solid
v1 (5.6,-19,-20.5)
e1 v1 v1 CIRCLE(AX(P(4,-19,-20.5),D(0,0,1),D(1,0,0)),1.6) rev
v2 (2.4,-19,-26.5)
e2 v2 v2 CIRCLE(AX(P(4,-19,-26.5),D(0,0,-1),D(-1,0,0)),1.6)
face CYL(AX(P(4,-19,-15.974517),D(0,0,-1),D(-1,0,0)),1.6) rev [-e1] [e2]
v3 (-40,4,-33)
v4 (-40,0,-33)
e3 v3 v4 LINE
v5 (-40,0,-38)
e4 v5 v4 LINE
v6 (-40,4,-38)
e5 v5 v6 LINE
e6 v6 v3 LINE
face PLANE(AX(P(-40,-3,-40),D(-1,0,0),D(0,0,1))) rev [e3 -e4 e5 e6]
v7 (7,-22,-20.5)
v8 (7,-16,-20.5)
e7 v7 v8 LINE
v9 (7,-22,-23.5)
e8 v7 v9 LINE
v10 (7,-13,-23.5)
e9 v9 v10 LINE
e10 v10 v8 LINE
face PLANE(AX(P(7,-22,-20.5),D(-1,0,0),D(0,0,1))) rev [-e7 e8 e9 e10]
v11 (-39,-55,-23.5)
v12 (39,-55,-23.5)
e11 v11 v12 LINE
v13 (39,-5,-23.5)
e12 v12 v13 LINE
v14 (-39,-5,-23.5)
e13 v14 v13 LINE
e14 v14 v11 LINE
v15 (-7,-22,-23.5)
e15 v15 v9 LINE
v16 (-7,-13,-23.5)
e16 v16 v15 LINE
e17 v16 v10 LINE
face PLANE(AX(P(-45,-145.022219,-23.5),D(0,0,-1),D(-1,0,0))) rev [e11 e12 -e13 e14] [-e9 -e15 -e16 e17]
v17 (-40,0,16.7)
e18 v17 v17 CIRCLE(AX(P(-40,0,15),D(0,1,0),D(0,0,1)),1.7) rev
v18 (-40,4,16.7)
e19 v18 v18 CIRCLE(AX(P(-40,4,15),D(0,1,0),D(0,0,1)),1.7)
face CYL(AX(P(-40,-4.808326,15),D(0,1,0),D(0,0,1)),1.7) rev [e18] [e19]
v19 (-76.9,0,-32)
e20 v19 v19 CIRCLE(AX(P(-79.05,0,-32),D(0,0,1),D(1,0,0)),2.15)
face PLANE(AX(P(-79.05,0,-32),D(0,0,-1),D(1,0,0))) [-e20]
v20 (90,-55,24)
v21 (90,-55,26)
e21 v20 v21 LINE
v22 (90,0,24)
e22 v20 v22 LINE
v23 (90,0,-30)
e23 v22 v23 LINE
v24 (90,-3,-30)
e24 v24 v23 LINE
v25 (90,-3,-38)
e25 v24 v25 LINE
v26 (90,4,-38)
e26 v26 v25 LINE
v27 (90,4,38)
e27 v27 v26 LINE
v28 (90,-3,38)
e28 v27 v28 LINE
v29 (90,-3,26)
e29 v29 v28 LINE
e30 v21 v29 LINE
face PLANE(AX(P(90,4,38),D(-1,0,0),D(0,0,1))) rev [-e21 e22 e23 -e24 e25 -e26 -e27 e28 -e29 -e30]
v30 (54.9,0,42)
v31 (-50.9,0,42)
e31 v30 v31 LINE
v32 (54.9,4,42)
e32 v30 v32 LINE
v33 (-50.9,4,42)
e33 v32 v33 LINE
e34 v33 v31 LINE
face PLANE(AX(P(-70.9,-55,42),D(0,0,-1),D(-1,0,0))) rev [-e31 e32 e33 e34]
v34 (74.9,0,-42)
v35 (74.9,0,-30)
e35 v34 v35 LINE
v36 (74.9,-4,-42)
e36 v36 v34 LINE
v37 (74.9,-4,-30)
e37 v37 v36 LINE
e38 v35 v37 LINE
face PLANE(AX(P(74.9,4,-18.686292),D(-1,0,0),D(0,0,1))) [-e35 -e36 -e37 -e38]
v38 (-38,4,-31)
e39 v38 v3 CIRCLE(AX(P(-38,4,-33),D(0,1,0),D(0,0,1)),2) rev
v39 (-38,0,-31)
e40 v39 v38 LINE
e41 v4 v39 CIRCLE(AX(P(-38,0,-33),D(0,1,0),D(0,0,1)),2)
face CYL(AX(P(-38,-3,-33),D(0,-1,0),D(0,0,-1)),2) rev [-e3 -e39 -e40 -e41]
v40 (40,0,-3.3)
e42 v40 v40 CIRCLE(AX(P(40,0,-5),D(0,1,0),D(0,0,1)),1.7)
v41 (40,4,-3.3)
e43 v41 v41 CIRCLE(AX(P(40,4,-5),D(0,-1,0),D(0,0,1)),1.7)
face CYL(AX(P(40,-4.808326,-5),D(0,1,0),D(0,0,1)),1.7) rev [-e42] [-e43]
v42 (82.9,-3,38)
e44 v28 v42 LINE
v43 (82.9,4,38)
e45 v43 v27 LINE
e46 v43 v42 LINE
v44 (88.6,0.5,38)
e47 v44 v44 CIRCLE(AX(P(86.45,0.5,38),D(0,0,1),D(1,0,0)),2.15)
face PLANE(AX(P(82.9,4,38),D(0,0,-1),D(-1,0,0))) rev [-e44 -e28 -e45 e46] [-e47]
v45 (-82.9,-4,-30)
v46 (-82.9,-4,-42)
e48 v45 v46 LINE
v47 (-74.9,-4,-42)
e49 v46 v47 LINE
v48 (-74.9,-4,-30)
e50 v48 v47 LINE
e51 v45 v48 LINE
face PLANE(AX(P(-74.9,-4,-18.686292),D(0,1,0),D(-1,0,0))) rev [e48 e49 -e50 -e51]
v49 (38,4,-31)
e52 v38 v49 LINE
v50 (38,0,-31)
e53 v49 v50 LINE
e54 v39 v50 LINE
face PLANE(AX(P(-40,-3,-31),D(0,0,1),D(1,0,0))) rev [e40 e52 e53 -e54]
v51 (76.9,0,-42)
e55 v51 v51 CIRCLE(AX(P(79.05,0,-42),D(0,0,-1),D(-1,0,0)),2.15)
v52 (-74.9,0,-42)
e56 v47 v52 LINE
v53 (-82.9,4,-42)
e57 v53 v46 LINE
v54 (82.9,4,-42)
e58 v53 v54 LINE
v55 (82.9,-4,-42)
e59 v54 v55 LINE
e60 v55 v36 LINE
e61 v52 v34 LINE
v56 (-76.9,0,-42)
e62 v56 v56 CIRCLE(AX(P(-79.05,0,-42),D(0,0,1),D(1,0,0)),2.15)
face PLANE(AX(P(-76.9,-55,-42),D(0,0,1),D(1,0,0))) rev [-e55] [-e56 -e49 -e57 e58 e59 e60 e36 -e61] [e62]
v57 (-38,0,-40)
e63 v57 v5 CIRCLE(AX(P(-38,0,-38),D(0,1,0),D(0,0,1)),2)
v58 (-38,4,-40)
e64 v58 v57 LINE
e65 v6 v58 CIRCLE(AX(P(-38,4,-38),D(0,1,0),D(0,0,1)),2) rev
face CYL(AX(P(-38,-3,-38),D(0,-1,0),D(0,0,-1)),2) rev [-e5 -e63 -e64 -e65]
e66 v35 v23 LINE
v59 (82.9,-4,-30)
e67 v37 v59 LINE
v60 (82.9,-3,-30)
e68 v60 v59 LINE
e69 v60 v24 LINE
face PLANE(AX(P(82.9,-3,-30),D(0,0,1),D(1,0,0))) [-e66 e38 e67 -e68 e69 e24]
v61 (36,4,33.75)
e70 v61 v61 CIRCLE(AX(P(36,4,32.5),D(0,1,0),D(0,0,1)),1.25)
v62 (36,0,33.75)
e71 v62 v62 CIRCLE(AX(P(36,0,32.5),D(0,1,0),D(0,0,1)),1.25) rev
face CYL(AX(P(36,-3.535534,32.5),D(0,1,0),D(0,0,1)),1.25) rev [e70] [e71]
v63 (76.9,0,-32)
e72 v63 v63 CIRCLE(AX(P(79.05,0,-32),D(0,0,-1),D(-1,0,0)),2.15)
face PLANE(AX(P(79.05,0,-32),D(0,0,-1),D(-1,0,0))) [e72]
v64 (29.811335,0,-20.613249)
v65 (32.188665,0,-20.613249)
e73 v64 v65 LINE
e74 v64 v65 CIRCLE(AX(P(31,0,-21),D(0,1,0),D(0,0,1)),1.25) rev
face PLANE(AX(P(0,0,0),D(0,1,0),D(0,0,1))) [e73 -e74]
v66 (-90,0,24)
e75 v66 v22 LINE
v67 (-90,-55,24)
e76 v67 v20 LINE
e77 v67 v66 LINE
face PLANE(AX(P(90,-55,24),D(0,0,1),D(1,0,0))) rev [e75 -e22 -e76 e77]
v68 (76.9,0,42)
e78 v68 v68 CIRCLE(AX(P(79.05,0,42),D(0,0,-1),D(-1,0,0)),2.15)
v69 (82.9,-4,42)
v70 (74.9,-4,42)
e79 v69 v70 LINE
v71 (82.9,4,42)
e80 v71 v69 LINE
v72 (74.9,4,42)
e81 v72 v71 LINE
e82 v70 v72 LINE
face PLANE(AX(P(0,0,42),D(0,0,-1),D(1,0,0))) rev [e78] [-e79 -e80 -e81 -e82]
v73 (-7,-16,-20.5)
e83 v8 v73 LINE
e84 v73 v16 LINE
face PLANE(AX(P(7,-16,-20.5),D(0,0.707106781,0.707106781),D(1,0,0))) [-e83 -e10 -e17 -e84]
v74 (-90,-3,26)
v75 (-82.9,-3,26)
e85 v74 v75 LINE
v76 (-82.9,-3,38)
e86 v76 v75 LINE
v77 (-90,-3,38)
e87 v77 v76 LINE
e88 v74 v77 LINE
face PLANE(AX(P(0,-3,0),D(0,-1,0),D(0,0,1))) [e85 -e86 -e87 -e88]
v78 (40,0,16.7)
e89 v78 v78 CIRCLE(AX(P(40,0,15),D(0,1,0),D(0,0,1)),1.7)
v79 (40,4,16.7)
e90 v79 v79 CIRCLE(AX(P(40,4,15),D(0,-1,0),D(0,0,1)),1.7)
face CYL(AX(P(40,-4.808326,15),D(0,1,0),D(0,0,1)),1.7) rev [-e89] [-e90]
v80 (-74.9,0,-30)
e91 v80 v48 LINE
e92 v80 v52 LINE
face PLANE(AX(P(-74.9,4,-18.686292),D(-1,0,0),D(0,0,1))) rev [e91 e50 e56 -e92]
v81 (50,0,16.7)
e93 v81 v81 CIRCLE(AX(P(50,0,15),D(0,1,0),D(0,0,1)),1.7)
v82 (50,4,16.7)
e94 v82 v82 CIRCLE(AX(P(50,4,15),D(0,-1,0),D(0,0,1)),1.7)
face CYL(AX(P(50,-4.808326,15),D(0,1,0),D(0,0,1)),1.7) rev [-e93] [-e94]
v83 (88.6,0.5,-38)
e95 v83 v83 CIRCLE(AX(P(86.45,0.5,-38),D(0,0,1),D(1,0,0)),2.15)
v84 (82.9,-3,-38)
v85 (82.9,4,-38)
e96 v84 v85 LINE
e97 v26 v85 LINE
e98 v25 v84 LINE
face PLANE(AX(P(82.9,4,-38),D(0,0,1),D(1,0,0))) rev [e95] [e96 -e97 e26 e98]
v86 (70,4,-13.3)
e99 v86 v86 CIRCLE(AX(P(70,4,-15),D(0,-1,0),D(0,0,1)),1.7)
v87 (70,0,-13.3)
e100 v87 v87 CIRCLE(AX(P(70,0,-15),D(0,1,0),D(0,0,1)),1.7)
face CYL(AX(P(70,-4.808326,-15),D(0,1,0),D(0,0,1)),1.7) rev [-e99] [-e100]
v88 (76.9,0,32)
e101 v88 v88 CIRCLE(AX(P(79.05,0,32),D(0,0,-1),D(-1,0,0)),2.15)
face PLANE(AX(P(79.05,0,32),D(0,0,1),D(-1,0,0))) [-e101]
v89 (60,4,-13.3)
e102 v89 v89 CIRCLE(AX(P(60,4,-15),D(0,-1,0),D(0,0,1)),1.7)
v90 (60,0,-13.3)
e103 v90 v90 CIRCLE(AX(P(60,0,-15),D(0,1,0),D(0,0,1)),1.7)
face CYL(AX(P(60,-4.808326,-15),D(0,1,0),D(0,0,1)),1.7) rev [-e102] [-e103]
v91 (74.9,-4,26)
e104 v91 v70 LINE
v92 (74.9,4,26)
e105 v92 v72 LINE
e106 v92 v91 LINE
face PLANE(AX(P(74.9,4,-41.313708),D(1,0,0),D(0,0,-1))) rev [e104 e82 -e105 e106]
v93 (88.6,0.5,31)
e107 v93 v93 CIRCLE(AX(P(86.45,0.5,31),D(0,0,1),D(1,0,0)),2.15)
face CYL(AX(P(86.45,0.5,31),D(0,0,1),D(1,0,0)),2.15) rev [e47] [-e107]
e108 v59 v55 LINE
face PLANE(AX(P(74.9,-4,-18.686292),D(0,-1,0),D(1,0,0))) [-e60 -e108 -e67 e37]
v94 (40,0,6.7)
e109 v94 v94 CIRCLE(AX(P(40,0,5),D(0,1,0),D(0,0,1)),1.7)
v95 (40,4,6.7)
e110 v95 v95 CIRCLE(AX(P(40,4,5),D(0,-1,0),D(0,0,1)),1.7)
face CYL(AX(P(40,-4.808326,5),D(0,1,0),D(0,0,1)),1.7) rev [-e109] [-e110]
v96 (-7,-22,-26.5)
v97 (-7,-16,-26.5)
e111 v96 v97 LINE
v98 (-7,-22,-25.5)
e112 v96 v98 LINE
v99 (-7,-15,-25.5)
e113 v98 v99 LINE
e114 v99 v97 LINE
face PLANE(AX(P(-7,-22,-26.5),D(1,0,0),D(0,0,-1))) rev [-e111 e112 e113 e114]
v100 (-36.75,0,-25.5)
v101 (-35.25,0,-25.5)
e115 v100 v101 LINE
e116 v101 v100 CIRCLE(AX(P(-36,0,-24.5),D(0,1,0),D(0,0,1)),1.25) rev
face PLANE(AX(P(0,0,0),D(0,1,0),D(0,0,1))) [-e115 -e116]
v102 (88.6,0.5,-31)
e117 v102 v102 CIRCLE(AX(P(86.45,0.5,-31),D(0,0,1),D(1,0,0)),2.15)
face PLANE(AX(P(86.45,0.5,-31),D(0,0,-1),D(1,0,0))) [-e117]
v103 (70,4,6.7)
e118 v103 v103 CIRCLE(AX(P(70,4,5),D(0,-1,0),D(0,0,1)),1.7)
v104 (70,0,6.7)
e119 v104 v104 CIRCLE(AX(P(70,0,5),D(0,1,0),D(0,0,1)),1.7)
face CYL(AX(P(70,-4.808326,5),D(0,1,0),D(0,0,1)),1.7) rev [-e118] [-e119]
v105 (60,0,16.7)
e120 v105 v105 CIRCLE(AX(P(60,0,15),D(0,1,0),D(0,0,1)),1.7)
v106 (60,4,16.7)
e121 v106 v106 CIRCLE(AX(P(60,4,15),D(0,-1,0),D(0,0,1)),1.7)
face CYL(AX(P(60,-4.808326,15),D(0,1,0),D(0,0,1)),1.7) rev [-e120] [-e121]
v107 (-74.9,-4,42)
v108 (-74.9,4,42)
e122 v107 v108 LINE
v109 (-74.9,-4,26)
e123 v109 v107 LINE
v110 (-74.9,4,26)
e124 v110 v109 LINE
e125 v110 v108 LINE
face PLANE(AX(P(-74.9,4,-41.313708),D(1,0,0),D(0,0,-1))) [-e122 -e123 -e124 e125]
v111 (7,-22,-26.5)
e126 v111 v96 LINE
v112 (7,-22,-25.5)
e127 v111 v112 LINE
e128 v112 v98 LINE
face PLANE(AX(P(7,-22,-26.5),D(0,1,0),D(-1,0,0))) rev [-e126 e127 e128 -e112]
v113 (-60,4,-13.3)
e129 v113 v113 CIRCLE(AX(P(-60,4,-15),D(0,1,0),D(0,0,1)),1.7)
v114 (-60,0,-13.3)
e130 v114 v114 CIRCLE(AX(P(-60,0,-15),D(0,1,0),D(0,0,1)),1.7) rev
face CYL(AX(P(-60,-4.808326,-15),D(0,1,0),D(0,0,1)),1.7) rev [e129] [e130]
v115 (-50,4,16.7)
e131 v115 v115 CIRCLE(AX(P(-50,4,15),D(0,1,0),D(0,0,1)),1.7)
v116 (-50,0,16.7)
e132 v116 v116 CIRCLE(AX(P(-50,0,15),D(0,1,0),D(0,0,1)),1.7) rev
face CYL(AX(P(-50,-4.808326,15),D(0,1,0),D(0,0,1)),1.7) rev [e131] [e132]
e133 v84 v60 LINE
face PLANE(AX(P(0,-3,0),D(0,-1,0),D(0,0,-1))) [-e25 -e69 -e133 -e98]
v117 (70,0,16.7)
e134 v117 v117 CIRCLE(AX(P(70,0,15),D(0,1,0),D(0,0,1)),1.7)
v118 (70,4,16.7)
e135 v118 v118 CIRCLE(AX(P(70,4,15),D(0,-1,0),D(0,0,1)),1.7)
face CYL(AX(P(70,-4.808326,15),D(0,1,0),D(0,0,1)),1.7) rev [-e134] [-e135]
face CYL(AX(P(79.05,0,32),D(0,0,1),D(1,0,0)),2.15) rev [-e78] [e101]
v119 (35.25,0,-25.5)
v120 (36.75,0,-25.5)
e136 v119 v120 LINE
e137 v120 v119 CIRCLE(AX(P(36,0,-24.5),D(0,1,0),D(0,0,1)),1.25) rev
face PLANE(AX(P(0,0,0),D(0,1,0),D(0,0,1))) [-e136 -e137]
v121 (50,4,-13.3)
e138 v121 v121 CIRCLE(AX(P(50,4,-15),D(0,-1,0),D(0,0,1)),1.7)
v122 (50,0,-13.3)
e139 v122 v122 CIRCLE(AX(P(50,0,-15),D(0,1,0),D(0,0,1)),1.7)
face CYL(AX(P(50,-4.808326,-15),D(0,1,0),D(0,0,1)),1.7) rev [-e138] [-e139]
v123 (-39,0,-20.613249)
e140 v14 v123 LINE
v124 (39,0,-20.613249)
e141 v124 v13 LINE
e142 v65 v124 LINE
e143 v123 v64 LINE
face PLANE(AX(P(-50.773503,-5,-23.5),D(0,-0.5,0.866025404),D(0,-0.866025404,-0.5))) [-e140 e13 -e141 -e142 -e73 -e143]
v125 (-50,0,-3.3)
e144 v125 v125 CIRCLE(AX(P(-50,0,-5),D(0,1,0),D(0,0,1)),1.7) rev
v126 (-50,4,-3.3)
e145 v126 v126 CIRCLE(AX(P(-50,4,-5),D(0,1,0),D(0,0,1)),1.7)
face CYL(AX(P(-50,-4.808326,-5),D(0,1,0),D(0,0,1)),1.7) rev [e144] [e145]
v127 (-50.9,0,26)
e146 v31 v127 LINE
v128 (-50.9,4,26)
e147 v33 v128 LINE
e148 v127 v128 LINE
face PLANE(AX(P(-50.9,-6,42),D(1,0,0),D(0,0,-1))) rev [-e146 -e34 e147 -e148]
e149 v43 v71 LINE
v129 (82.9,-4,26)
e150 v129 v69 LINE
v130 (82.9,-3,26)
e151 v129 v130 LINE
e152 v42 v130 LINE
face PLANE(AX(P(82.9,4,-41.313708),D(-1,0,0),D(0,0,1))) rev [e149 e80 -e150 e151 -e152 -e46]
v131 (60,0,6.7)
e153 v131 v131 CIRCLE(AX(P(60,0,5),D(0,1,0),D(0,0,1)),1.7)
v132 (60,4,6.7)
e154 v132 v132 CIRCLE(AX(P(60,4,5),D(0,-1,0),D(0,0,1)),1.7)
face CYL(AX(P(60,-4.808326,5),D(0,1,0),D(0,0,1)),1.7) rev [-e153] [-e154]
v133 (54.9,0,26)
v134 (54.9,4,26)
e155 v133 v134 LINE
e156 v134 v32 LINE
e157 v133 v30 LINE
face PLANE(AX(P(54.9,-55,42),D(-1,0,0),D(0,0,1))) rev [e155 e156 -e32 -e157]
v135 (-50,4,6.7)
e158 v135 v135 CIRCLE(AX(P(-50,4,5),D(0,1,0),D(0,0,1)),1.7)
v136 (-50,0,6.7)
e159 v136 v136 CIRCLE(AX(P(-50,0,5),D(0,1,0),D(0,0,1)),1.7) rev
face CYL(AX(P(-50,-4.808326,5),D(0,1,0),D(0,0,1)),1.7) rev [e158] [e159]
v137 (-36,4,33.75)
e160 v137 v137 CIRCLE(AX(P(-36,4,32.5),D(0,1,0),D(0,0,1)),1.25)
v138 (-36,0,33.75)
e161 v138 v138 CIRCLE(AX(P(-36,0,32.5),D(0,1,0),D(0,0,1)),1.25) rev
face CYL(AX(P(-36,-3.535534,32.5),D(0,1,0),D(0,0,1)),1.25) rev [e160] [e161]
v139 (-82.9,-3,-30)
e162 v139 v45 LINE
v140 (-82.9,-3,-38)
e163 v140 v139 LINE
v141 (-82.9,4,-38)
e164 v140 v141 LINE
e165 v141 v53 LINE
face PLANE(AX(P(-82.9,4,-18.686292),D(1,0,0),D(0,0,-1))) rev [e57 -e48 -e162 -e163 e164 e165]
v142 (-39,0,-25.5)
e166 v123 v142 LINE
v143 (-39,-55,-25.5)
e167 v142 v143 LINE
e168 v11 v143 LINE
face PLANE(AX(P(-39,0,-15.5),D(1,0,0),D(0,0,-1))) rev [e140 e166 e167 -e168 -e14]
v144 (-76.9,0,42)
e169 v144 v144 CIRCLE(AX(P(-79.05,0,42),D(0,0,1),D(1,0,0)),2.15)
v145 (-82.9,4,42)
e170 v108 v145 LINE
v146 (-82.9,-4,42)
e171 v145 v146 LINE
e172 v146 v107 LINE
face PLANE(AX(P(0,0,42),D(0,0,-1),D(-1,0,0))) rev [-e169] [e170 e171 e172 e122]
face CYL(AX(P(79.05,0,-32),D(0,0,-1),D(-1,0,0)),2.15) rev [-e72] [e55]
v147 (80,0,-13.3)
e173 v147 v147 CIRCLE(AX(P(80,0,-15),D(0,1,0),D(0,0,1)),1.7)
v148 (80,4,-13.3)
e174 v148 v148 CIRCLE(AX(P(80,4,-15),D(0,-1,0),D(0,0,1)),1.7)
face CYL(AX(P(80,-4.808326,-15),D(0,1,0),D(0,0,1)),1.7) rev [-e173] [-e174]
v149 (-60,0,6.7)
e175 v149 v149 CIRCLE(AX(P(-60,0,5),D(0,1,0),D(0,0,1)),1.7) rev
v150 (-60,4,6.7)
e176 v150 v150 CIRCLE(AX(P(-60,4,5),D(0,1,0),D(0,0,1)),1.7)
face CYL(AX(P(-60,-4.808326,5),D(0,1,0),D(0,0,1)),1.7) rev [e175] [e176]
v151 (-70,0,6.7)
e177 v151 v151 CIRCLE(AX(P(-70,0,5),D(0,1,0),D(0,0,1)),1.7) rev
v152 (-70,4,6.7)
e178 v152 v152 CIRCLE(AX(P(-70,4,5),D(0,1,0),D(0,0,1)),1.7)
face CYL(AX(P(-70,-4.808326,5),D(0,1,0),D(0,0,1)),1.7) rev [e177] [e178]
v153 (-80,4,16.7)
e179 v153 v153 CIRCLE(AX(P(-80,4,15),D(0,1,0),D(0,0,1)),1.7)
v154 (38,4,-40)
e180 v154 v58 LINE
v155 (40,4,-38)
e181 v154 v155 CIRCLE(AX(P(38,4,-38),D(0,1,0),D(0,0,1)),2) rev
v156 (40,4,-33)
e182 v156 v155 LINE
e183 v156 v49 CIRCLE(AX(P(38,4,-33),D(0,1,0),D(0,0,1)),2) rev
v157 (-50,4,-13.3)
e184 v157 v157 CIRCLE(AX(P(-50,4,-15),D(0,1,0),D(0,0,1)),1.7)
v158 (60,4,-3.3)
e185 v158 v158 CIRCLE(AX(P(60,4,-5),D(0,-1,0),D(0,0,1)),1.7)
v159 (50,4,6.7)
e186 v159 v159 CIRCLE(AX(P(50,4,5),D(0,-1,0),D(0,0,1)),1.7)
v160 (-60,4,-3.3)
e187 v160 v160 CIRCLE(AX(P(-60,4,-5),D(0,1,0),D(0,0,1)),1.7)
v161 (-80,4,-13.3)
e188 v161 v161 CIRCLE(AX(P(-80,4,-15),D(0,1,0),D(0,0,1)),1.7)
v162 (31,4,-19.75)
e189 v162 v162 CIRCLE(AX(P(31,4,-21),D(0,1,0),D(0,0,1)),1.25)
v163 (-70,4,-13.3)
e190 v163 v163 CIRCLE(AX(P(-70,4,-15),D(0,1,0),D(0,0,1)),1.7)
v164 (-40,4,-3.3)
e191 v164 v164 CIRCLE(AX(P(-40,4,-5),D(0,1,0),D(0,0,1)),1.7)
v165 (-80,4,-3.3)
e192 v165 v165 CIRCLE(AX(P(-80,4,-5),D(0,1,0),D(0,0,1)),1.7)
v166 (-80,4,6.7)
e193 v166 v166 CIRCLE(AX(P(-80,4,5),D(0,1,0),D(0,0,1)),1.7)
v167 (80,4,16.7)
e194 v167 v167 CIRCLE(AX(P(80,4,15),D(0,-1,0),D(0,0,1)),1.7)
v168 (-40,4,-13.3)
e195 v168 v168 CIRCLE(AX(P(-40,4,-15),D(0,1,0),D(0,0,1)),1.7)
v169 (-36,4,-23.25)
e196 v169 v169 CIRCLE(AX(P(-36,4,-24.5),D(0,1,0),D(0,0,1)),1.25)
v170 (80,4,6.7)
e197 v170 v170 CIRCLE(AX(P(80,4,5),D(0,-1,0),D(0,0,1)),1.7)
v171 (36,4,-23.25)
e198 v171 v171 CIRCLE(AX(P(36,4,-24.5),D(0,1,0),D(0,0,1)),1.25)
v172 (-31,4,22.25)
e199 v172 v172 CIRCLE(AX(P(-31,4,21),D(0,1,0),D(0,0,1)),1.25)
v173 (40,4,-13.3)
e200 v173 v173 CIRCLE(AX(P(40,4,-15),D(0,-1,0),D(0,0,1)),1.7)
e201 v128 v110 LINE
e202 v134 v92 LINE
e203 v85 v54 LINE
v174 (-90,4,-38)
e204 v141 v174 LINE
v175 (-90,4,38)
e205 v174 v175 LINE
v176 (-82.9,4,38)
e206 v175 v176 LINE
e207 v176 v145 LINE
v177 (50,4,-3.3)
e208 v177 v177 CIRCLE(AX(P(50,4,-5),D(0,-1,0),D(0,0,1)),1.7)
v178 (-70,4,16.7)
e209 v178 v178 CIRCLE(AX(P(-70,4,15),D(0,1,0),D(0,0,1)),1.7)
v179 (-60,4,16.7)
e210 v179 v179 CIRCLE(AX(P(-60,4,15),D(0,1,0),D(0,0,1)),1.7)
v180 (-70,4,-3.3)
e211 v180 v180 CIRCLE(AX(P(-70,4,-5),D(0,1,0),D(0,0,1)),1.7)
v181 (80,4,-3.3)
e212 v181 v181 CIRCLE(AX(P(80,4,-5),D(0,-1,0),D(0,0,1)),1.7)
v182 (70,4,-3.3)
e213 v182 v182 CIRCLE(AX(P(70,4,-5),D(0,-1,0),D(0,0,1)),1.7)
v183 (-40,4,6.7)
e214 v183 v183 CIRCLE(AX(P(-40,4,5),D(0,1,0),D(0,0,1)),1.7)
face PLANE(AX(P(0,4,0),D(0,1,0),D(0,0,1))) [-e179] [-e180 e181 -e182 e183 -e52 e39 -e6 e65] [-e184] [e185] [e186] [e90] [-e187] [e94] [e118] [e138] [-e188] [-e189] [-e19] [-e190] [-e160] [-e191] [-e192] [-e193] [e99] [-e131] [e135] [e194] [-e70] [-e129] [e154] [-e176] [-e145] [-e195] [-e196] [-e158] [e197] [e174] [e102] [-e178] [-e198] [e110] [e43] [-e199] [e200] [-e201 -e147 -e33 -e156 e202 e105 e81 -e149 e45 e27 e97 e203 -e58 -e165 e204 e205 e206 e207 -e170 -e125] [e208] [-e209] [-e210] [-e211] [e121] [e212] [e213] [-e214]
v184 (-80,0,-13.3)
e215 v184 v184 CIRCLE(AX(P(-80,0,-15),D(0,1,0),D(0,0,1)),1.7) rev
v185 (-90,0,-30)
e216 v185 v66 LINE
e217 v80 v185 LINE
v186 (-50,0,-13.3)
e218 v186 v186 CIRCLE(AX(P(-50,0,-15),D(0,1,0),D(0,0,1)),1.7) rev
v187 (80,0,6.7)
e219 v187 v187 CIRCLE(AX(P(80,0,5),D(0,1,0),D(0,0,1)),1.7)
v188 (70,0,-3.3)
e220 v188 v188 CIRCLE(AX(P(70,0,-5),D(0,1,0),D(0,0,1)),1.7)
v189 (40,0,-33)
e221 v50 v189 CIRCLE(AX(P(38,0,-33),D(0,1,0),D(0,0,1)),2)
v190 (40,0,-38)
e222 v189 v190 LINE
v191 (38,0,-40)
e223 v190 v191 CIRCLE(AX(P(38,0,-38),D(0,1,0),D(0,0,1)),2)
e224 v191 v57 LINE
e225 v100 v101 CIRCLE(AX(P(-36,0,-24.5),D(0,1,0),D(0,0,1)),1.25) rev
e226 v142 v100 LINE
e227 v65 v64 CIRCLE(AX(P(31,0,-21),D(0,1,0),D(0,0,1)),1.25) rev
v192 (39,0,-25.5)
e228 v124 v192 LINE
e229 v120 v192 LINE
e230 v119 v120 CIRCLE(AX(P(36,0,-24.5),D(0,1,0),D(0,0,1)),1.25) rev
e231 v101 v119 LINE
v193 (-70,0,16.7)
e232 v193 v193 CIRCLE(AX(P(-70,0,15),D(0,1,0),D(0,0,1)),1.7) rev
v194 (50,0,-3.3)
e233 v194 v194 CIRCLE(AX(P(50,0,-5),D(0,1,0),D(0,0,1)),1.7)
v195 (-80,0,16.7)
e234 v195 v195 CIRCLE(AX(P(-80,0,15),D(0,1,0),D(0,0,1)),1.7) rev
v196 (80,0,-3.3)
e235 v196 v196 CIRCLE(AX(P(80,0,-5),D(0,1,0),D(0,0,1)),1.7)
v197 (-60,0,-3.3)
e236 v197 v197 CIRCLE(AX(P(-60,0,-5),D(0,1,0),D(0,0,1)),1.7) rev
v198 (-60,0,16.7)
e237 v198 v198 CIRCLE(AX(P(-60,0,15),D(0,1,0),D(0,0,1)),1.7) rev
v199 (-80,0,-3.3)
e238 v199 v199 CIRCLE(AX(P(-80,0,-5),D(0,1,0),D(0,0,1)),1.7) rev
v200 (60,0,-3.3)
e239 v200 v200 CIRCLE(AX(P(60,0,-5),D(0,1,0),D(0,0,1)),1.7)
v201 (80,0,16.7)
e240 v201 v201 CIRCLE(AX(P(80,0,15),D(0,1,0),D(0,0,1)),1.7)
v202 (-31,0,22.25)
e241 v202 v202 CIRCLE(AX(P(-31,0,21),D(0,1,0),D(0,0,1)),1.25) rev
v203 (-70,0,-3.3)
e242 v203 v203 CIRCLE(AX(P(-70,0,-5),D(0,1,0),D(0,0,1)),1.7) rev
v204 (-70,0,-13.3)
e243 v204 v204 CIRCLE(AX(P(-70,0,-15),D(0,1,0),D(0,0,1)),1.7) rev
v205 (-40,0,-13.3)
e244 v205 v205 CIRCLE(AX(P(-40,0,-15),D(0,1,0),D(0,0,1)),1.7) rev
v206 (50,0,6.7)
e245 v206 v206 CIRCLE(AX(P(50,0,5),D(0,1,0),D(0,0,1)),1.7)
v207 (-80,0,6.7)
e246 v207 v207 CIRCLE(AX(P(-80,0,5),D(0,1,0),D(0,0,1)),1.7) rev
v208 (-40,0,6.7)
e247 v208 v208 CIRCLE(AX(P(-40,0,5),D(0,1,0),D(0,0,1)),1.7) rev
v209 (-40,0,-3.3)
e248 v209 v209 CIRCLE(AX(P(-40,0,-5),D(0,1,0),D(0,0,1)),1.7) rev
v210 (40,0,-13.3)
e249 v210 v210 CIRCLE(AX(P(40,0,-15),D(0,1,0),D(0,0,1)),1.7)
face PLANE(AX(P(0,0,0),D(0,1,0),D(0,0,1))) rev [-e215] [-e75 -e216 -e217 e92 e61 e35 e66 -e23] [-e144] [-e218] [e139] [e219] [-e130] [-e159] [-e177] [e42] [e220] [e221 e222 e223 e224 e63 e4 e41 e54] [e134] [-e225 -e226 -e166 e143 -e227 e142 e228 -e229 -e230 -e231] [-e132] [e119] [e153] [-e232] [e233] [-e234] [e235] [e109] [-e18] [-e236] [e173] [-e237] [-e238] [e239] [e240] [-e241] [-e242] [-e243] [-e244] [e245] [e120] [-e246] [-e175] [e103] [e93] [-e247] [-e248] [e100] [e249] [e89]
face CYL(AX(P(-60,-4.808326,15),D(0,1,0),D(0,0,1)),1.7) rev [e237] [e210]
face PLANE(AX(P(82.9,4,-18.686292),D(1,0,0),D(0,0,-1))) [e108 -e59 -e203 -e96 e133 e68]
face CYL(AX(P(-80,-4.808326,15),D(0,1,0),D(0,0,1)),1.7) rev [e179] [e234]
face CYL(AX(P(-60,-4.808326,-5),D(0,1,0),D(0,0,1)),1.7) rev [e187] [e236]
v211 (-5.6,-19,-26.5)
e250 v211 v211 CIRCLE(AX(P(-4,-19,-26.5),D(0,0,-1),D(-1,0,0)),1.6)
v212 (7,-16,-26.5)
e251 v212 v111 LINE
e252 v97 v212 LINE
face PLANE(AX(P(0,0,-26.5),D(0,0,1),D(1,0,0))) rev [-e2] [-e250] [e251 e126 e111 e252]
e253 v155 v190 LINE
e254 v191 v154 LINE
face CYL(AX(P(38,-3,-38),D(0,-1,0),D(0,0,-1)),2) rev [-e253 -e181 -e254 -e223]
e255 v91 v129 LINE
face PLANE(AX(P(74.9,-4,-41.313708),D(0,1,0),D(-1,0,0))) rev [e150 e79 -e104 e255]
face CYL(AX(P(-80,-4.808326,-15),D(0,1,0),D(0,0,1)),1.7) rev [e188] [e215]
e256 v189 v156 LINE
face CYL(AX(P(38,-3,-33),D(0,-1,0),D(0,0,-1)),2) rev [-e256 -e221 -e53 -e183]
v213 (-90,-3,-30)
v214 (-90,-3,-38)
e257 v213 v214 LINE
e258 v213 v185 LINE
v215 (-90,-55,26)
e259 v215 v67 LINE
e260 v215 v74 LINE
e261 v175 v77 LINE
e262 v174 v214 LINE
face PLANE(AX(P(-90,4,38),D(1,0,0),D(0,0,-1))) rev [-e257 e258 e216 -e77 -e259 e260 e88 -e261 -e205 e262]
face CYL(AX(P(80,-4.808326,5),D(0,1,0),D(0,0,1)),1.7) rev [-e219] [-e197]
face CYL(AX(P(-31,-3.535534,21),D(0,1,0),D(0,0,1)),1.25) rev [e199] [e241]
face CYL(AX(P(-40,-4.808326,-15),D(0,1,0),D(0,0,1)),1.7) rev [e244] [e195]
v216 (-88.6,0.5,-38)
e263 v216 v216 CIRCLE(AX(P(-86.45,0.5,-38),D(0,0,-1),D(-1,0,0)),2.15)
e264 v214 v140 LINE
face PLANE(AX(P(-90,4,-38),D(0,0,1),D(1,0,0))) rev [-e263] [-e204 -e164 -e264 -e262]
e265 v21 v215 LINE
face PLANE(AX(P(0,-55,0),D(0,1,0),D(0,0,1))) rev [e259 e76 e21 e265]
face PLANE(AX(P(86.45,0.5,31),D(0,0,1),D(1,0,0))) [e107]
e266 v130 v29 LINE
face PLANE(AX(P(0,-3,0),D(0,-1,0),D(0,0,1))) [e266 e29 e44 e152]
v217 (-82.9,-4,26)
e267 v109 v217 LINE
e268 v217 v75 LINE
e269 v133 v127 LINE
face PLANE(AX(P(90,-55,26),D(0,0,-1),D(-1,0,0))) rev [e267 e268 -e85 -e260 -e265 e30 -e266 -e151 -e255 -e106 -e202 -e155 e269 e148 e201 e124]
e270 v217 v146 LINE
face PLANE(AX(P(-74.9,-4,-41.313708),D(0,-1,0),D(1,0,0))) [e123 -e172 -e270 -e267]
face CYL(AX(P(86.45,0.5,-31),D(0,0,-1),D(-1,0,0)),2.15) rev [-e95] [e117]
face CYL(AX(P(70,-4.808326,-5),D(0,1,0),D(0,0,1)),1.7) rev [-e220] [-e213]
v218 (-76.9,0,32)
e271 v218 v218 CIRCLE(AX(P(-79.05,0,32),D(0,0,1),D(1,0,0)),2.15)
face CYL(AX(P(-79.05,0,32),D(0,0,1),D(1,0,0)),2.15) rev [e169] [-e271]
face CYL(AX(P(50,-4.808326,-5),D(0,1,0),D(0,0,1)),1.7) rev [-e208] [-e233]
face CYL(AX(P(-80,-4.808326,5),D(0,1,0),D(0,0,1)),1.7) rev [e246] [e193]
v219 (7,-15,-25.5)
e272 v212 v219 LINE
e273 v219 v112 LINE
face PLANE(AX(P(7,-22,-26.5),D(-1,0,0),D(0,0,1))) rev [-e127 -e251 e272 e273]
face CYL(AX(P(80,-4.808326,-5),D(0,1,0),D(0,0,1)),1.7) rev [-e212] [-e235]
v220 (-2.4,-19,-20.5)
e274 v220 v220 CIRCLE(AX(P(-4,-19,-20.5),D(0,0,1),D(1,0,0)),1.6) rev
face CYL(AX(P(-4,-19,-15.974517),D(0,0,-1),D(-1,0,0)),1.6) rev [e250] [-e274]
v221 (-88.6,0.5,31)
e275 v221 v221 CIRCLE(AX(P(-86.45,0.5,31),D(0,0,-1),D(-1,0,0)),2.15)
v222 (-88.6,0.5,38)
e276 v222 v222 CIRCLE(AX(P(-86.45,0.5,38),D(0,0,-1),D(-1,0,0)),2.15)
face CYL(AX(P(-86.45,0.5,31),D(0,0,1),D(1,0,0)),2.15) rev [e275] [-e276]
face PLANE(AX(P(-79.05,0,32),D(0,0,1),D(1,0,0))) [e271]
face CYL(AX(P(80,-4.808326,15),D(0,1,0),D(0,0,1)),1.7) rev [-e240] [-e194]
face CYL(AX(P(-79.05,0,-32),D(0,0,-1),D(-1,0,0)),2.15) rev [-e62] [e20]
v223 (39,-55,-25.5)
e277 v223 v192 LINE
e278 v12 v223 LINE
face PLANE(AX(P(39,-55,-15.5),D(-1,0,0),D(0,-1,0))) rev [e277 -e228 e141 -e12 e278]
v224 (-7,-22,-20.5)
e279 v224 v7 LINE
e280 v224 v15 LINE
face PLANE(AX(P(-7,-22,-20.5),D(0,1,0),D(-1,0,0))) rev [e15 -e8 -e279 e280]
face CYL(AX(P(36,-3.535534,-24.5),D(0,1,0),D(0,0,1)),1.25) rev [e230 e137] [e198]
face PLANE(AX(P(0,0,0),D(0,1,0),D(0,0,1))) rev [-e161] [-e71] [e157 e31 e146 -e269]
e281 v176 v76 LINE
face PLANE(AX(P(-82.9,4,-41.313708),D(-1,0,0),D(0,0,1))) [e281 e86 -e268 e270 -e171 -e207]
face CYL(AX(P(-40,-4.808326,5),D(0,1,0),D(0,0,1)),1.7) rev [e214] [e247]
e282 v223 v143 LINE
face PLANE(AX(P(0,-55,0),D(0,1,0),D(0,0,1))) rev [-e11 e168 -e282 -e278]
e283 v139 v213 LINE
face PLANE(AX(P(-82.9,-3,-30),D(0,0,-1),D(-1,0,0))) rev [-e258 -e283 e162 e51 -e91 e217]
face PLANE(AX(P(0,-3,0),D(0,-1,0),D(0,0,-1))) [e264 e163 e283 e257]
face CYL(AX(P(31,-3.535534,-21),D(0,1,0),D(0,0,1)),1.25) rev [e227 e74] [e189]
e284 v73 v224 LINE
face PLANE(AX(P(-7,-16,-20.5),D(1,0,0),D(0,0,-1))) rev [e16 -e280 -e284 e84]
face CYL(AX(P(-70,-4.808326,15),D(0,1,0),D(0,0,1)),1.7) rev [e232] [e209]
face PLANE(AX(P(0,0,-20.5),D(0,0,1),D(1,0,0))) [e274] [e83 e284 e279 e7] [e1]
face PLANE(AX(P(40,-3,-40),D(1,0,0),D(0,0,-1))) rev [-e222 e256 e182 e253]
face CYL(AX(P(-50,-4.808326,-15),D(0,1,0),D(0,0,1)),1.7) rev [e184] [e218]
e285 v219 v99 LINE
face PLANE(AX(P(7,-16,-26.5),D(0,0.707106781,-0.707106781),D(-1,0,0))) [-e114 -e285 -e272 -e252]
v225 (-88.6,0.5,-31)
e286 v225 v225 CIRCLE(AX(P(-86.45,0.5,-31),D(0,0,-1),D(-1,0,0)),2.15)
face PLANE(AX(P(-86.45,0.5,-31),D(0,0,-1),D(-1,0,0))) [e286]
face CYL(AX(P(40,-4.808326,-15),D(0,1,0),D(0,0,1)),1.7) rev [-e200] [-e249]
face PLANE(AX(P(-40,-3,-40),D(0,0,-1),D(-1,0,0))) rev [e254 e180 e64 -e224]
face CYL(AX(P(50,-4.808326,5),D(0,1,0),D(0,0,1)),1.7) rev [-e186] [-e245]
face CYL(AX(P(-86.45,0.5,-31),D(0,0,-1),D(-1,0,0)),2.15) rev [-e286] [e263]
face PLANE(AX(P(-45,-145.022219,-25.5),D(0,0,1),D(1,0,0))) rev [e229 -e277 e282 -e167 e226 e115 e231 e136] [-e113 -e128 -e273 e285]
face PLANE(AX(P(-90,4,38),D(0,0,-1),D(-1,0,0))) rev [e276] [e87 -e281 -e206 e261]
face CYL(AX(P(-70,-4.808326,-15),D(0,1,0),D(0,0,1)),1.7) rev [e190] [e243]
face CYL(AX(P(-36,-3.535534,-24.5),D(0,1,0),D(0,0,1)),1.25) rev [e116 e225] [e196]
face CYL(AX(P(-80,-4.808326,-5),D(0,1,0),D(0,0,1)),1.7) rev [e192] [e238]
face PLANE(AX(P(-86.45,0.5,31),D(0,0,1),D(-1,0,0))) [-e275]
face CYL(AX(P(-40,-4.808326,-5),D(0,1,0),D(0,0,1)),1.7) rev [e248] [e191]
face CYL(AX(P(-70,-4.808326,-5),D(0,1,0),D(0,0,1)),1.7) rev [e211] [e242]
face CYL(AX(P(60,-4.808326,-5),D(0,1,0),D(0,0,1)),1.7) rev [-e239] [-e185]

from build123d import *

# Parameters (mm, degrees)
BOSS_EXTRUDE1_DEPTH             = 4
SKETCH3_W                       = 7.1
SKETCH3_H                       = 8
BOSS_EXTRUDE3_DEPTH             = 3
SKETCH4_R                       = 2.15
CUT_EXTRUDE1_DEPTH              = 7
MIRROR2_COPY_1_SKETCH_W         = 7.1
MIRROR2_COPY_1_SKETCH_H         = 8
MIRROR2_COPY_1_DEPTH            = 3
MIRROR2_COPY_2_SKETCH_R         = 2.15
MIRROR2_COPY_2_DEPTH            = 7
SKETCH5_W                       = 80
SKETCH5_H                       = 9
CUT_EXTRUDE2_DEPTH              = 101.866248071
FILLET1_R                       = 2
SKETCH7_W                       = 165.8
SKETCH7_H                       = 1
CUT_EXTRUDE3_DEPTH              = 101.866248071
SKETCH8_W                       = 180
SKETCH8_H                       = 2
BOSS_EXTRUDE4_DEPTH             = 55
SKETCH9_W                       = 12
SKETCH9_H                       = 18
CUT_EXTRUDE4_DEPTH              = 10
SKETCH10_W                      = 7.1
SKETCH10_H                      = 4
BOSS_EXTRUDE5_DEPTH             = 3
SKETCH12_W                      = 1.5
SKETCH12_H                      = 4
BOSS_EXTRUDE6_DEPTH             = 2
SKETCH13_W                      = 90
SKETCH13_H                      = 2
BOSS_EXTRUDE7_DEPTH             = 55
SKETCH14_W                      = 1.5
SKETCH14_H                      = 4
BOSS_EXTRUDE8_DEPTH             = 1
BOSS_EXTRUDE9_REACH             = 116.285
BOSS_EXTRUDE9_DIRECTION_2_REACH = 116.285
SKETCH16_W                      = 20
SKETCH16_H                      = 14
SKETCH16_W_2                    = 14.5
SKETCH16_H_2                    = 9
BOSS_EXTRUDE10_DEPTH            = 4
SKETCH17_W                      = 12
SKETCH17_H                      = 18
CUT_EXTRUDE5_DEPTH              = 115.284732139
SKETCH18_W                      = 6
SKETCH18_H                      = 6
CUT_EXTRUDE6_DEPTH              = 117.262633722
SKETCH22_R                      = 1.25
CUT_EXTRUDE7_DEPTH              = 4
SKETCH25_W                      = 6
SKETCH25_H                      = 55
CUT_EXTRUDE11_DEPTH             = 10
CUT_EXTRUDE12_DEPTH             = 116.073889306
CUT_EXTRUDE12_DEPTH_BACK        = 116.073889306
SKETCH26_W                      = 3.576083065
SKETCH26_H                      = 29.903718591
SKETCH26_W_2                    = 12.269447076
SKETCH26_H_2                    = 28.524331859
SKETCH27_R                      = 1.25
CUT_EXTRUDE13_DEPTH             = 4
SKETCH28_W                      = 153.8
SKETCH28_H                      = 0.6
SKETCH28_W_2                    = 141.8
CUT_EXTRUDE14_DEPTH             = 117.262633722
SKETCH29_W                      = 141.8
SKETCH29_H                      = 1.4
CUT_EXTRUDE15_DEPTH             = 117.036890686
SKETCH30_W                      = 153.8
SKETCH30_H                      = 1.4
CUT_EXTRUDE16_DEPTH             = 117.036890686
SKETCH31_W                      = 2
SKETCH31_H                      = 4
CUT_EXTRUDE17_DEPTH             = 116.52056094
BOSS_EXTRUDE11_START            = -12
SKETCH32_W                      = 8
SKETCH32_H                      = 8
BOSS_EXTRUDE11_DEPTH            = 12
SKETCH33_R                      = 2.15
CUT_EXTRUDE18_DEPTH             = 10
MIRROR5_START                   = -30
MIRROR5_OUTLINE_W               = 8
MIRROR5_OUTLINE_H               = 8
MIRROR5_OUTLINE_R               = 2.15
MIRROR5_DEPTH                   = 72
MIRROR5_2_OUTLINE_R             = 2.15
MIRROR5_2_DEPTH                 = 62
SKETCH34_W                      = 20
SKETCH34_H                      = 16
CUT_EXTRUDE19_DEPTH             = 10
SKETCH35_W                      = 8
SKETCH35_H                      = 54
CUT_EXTRUDE20_DEPTH             = 4
SKETCH36_W                      = 14
SKETCH36_H                      = 6
BOSS_EXTRUDE12_DEPTH            = 1
SKETCH38_W                      = 14
SKETCH38_H                      = 6
BOSS_EXTRUDE13_DEPTH            = 3
CHAMFER1_SIZE                   = 1
SKETCH37_R                      = 1.6
CUT_EXTRUDE21_DEPTH             = 6
CHAMFER2_SIZE                   = 3
SKETCH39_W                      = 20
SKETCH39_H                      = 14
CUT_EXTRUDE22_DEPTH             = 16
SKETCH40_W                      = 16
SKETCH40_H                      = 16
CUT_EXTRUDE23_DEPTH             = 116.52056094
SKETCH41_R                      = 1.7
CUT_EXTRUDE24_DEPTH             = 4


# Read off the part's stored shape, not the designer's step: Mirror5
with BuildPart() as part:
    # Sketch1 → Boss-Extrude1 (new body)
    with BuildSketch(Plane(origin=(0, 0, 0), x_dir=(1, 0, 0), z_dir=(0, 1, 0))):
        Polygon((-90, -38), (-82.9, -38), (-82.9, -45), (82.9, -45), (82.9, -38), (90, -38), (90, 38), (82.9, 38), (82.9, 45), (-82.9, 45), (-82.9, 38), (-90, 38), align=None)
    extrude(amount=BOSS_EXTRUDE1_DEPTH)

    # Sketch3 → Boss-Extrude3 (add)
    with BuildSketch(Plane.XZ):
        with Locations((-86.45, -34)):
            Rectangle(SKETCH3_W, SKETCH3_H)
    boss_extrude3 = extrude(amount=BOSS_EXTRUDE3_DEPTH)

    # Sketch4 → Cut-Extrude1 (cut)
    with BuildSketch(Plane(origin=(0, 0, -38), x_dir=(-1, 0, 0), z_dir=(0, 0, -1))):
        with Locations((86.45, 0.5)):
            Circle(SKETCH4_R)
    cut_extrude1 = extrude(amount=-CUT_EXTRUDE1_DEPTH, mode=Mode.SUBTRACT)

    # Mirror1: Boss-Extrude3, Cut-Extrude1 across plane
    add(boss_extrude3.mirror(Plane(origin=(0, 0, 0), x_dir=(0, 0, 1), z_dir=(1, 0, 0))))
    add(cut_extrude1.mirror(Plane(origin=(0, 0, 0), x_dir=(0, 0, 1), z_dir=(1, 0, 0))), mode=Mode.SUBTRACT)

    # Mirror2: Boss-Extrude3, Cut-Extrude1 across plane
    add(boss_extrude3.mirror(Plane.XY))
    add(cut_extrude1.mirror(Plane.XY), mode=Mode.SUBTRACT)

    # Mirror2 copy 1 sketch → Mirror2 copy 1 (add)
    with BuildSketch(Plane(origin=(0, 0, 0), x_dir=(-1, 0, 0), z_dir=(0, -1, 0))):
        with Locations((-86.45, -34)):
            Rectangle(MIRROR2_COPY_1_SKETCH_W, MIRROR2_COPY_1_SKETCH_H)
    extrude(amount=MIRROR2_COPY_1_DEPTH)

    # Mirror2 copy 2 sketch → Mirror2 copy 2 (cut)
    with BuildSketch(Plane.XY.offset(38)):
        with Locations((86.45, 0.5)):
            Circle(MIRROR2_COPY_2_SKETCH_R)
    extrude(amount=-MIRROR2_COPY_2_DEPTH, mode=Mode.SUBTRACT)

    # Sketch5 → Cut-Extrude2 (cut, through all)
    with BuildSketch(Plane(origin=(0, 4, 0), x_dir=(1, 0, 0), z_dir=(0, 1, 0))):
        with Locations((0, 35.5)):
            Rectangle(SKETCH5_W, SKETCH5_H)
    extrude(amount=-CUT_EXTRUDE2_DEPTH, mode=Mode.SUBTRACT)

    # Fillet1
    fillet1_edges = [part.edges().sort_by_distance(p)[0] for p in [
        (-40, 2, -31),
        (-40, 2, -40),
        (40, 2, -40),
        (40, 2, -31),
    ]]
    fillet(fillet1_edges, radius=FILLET1_R)

    # Sketch7 → Cut-Extrude3 (cut, through all)
    with BuildSketch(Plane(origin=(0, 4, 0), x_dir=(1, 0, 0), z_dir=(0, 1, 0))):
        with Locations((0, 44.5)):
            Rectangle(SKETCH7_W, SKETCH7_H)
        with Locations((0, -44.5)):
            Rectangle(SKETCH7_W, SKETCH7_H)
    extrude(amount=-CUT_EXTRUDE3_DEPTH, mode=Mode.SUBTRACT)

    # Sketch8 → Boss-Extrude4 (add)
    with BuildSketch(Plane.XZ):
        with Locations((0, 25)):
            Rectangle(SKETCH8_W, SKETCH8_H)
    extrude(amount=BOSS_EXTRUDE4_DEPTH)

    # Sketch9 → Cut-Extrude4 (cut)
    with BuildSketch(Plane(origin=(0, 4, 0), x_dir=(1, 0, 0), z_dir=(0, 1, 0))):
        with Locations((-76.9, -35)):
            Rectangle(SKETCH9_W, SKETCH9_H)
    extrude(amount=-CUT_EXTRUDE4_DEPTH, mode=Mode.SUBTRACT)

    # Sketch10 → Boss-Extrude5 (add)
    with BuildSketch(Plane.XZ.offset(3)):
        with Locations((-86.45, 28)):
            Rectangle(SKETCH10_W, SKETCH10_H)
        with Locations((86.45, 28)):
            Rectangle(SKETCH10_W, SKETCH10_H)
    extrude(amount=-BOSS_EXTRUDE5_DEPTH)

    # Sketch12 → Boss-Extrude6 (add)
    # profile 1 of 2: a face of its own
    with BuildSketch(Plane.ZY.offset(83)):
        Polygon((26, -5.8), (26, -16.2), (28.7, -13.5), (28.7, -8.5), align=None)
        with Locations((27.35, -11)):
            Rectangle(SKETCH12_W, SKETCH12_H, mode=Mode.SUBTRACT)
    # profile 2 of 2: a face of its own
    with BuildSketch(Plane.ZY.offset(83)):
        Polygon((26, -20.8), (26, -31.2), (28.7, -28.5), (28.7, -23.5), align=None)
        with Locations((27.35, -26)):
            Rectangle(SKETCH12_W, SKETCH12_H, mode=Mode.SUBTRACT)
    boss_extrude6 = extrude(amount=-BOSS_EXTRUDE6_DEPTH)

    # Mirror3: Boss-Extrude6 across plane
    add(boss_extrude6.mirror(Plane(origin=(-76.9, 0, 0), x_dir=(0, 0, 1), z_dir=(1, 0, 0))))

    # Sketch13 → Boss-Extrude7 (add)
    with BuildSketch(Plane.XZ):
        with Locations((0, -24.5)):
            Rectangle(SKETCH13_W, SKETCH13_H)
    extrude(amount=BOSS_EXTRUDE7_DEPTH)

    # Sketch14 → Boss-Extrude8 (add, symmetric)
    # profile 1 of 2: a face of its own
    with BuildSketch(Plane(origin=(0, 0, 0), x_dir=(0, 0, -1), z_dir=(1, 0, 0))):
        Polygon((28.2, -8.5), (25.5, -5.8), (25.5, -16.2), (28.2, -13.5), align=None)
        with Locations((26.85, -11)):
            Rectangle(SKETCH14_W, SKETCH14_H, mode=Mode.SUBTRACT)
    # profile 2 of 2: a face of its own
    with BuildSketch(Plane(origin=(0, 0, 0), x_dir=(0, 0, -1), z_dir=(1, 0, 0))):
        Polygon((28.2, -28.5), (28.2, -23.5), (25.5, -20.8), (25.5, -31.2), align=None)
        with Locations((26.85, -26)):
            Rectangle(SKETCH14_W, SKETCH14_H, mode=Mode.SUBTRACT)
    extrude(amount=BOSS_EXTRUDE8_DEPTH, both=True)

    # Boss-Extrude9: up to this face of the body (flat: up to its plane)
    boss_extrude9_end = Plane(part.part.faces().sort_by_distance((-45, -27.5, -24.5))[0])
    # Sketch15 → Boss-Extrude9 (add, up to the picked face)
    with BuildSketch(Plane(origin=(0, 0, 0), x_dir=(0, 0, -1), z_dir=(1, 0, 0)), mode=Mode.PRIVATE) as boss_extrude9_sk1:
        Polygon((23.5, 0), (23.5, -5), (20.613248654, 0), align=None)
    boss_extrude9_tool1 = split(extrude(boss_extrude9_sk1.sketch, amount=-BOSS_EXTRUDE9_REACH, mode=Mode.PRIVATE), bisect_by=boss_extrude9_end, keep=Keep.BOTH, mode=Mode.PRIVATE)
    add(boss_extrude9_tool1.solids().sort_by(Axis((0, -1.666667, -22.53775), (-1, 0, 0)))[0])

    # Boss-Extrude9 direction 2: up to this face of the body (flat: up to its plane)
    boss_extrude9_direction_2_end = Plane(part.part.faces().sort_by_distance((45, -27.5, -24.5))[0])
    # Sketch15 → Boss-Extrude9 direction 2 (add, up to the picked face)
    with BuildSketch(Plane(origin=(0, 0, 0), x_dir=(0, 0, -1), z_dir=(1, 0, 0)), mode=Mode.PRIVATE) as boss_extrude9_direction_2_sk1:
        Polygon((23.5, 0), (23.5, -5), (20.613248654, 0), align=None)
    boss_extrude9_direction_2_tool1 = split(extrude(boss_extrude9_direction_2_sk1.sketch, amount=BOSS_EXTRUDE9_DIRECTION_2_REACH, mode=Mode.PRIVATE), bisect_by=boss_extrude9_direction_2_end, keep=Keep.BOTH, mode=Mode.PRIVATE)
    add(boss_extrude9_direction_2_tool1.solids().sort_by(Axis((0, -1.666667, -22.53775), (1, 0, 0)))[0])

    # Sketch16 → Boss-Extrude10 (add)
    with BuildSketch(Plane.XY.offset(44)):
        with Locations((57, -7)):
            Rectangle(SKETCH16_W, SKETCH16_H)
        with Locations((57, -7)):
            Rectangle(SKETCH16_W_2, SKETCH16_H_2, mode=Mode.SUBTRACT)
    extrude(amount=-BOSS_EXTRUDE10_DEPTH)

    # Sketch17 → Cut-Extrude5 (cut, through all)
    with BuildSketch(Plane.XZ):
        with Locations((76.9, 35)):
            Rectangle(SKETCH17_W, SKETCH17_H)
    extrude(amount=-CUT_EXTRUDE5_DEPTH, mode=Mode.SUBTRACT)

    # Sketch18 → Cut-Extrude6 (cut, through all)
    with BuildSketch(Plane(origin=(0, 4, 0), x_dir=(1, 0, 0), z_dir=(0, 1, 0))):
        with Locations((79.9, 41)):
            Rectangle(SKETCH18_W, SKETCH18_H)
        with Locations((-79.9, 41)):
            Rectangle(SKETCH18_W, SKETCH18_H)
    extrude(amount=-CUT_EXTRUDE6_DEPTH, mode=Mode.SUBTRACT)

    # Sketch22 → Cut-Extrude7 (cut)
    with BuildSketch(Plane(origin=(0, 4, 0), x_dir=(1, 0, 0), z_dir=(0, 1, 0))):
        with Locations(Location((31, 21, 0), (0, 0, 270))):
            Circle(SKETCH22_R)
        with Locations(Location((-31, -21, 0), (0, 0, 270))):
            Circle(SKETCH22_R)
    extrude(amount=-CUT_EXTRUDE7_DEPTH, mode=Mode.SUBTRACT)

    # Sketch25 → Cut-Extrude11 (cut)
    with BuildSketch(Plane(origin=(0, 0, -25.5), x_dir=(-1, 0, 0), z_dir=(0, 0, -1))):
        with Locations((-42, -27.5)):
            Rectangle(SKETCH25_W, SKETCH25_H)
        with Locations((42, -27.5)):
            Rectangle(SKETCH25_W, SKETCH25_H)
    extrude(amount=-CUT_EXTRUDE11_DEPTH, mode=Mode.SUBTRACT)

    # Sketch26 → Cut-Extrude12 (cut, two sides: drawn at the far end of the back side and taken through both)
    with BuildSketch(Plane.ZY.offset(1).offset(-CUT_EXTRUDE12_DEPTH_BACK)):
        with Locations((-27.288041533, -20.751859296)):
            Rectangle(SKETCH26_W, SKETCH26_H)
        with Locations((32.134723538, -20.06216593)):
            Rectangle(SKETCH26_W_2, SKETCH26_H_2)
    extrude(amount=CUT_EXTRUDE12_DEPTH + CUT_EXTRUDE12_DEPTH_BACK, mode=Mode.SUBTRACT)

    # Sketch27 → Cut-Extrude13 (cut)
    with BuildSketch(Plane(origin=(0, 4, 0), x_dir=(1, 0, 0), z_dir=(0, 1, 0))):
        with Locations(Location((-36, 24.5, 0), (0, 0, 270))):
            Circle(SKETCH27_R)
        with Locations(Location((-36, -32.5, 0), (0, 0, 270))):
            Circle(SKETCH27_R)
        with Locations(Location((36, -32.5, 0), (0, 0, 270))):
            Circle(SKETCH27_R)
        with Locations(Location((36, 24.5, 0), (0, 0, 270))):
            Circle(SKETCH27_R)
    extrude(amount=-CUT_EXTRUDE13_DEPTH, mode=Mode.SUBTRACT)

    # Sketch28 → Cut-Extrude14 (cut, through all)
    with BuildSketch(Plane(origin=(0, 4, 0), x_dir=(1, 0, 0), z_dir=(0, 1, 0))):
        with Locations((0, 43.7)):
            Rectangle(SKETCH28_W, SKETCH28_H)
        with Locations((0, -43.7)):
            Rectangle(SKETCH28_W_2, SKETCH28_H)
    extrude(amount=-CUT_EXTRUDE14_DEPTH, mode=Mode.SUBTRACT)

    # Sketch29 → Cut-Extrude15 (cut, through all)
    with BuildSketch(Plane(origin=(0, 4, 0), x_dir=(1, 0, 0), z_dir=(0, 1, 0))):
        with Locations((0, -42.7)):
            Rectangle(SKETCH29_W, SKETCH29_H)
    extrude(amount=-CUT_EXTRUDE15_DEPTH, mode=Mode.SUBTRACT)

    # Sketch30 → Cut-Extrude16 (cut, through all)
    with BuildSketch(Plane(origin=(0, 4, 0), x_dir=(1, 0, 0), z_dir=(0, 1, 0))):
        with Locations((0, 42.7)):
            Rectangle(SKETCH30_W, SKETCH30_H)
    extrude(amount=-CUT_EXTRUDE16_DEPTH, mode=Mode.SUBTRACT)

    # Sketch31 → Cut-Extrude17 (cut, through all)
    with BuildSketch(Plane(origin=(0, 4, 0), x_dir=(1, 0, 0), z_dir=(0, 1, 0))):
        with Locations((-75.9, 40)):
            Rectangle(SKETCH31_W, SKETCH31_H)
        with Locations((75.9, 40)):
            Rectangle(SKETCH31_W, SKETCH31_H)
    extrude(amount=-CUT_EXTRUDE17_DEPTH, mode=Mode.SUBTRACT)

    # Sketch32 → Boss-Extrude11 (add)
    with BuildSketch(Plane(origin=(0, 0, -42), x_dir=(-1, 0, 0), z_dir=(0, 0, -1)).offset(BOSS_EXTRUDE11_START)):
        with Locations((-78.9, 0)):
            Rectangle(SKETCH32_W, SKETCH32_H)
    boss_extrude11 = extrude(amount=BOSS_EXTRUDE11_DEPTH)

    # Sketch33 → Cut-Extrude18 (cut)
    with BuildSketch(Plane(origin=(0, 0, -42), x_dir=(-1, 0, 0), z_dir=(0, 0, -1))):
        with Locations((-79.05, 0)):
            Circle(SKETCH33_R)
    cut_extrude18 = extrude(amount=-CUT_EXTRUDE18_DEPTH, mode=Mode.SUBTRACT)

    # Mirror4: Boss-Extrude11, Cut-Extrude18 across plane
    add(boss_extrude11.mirror(Plane(origin=(0, 0, 0), x_dir=(0, 0, 1), z_dir=(1, 0, 0))))
    add(cut_extrude18.mirror(Plane(origin=(0, 0, 0), x_dir=(0, 0, 1), z_dir=(1, 0, 0))), mode=Mode.SUBTRACT)

    # Mirror5 outline → Mirror5 (add)
    # profile 1 of 2: a face of its own
    with BuildSketch(Plane.XY.offset(MIRROR5_START)):
        with Locations((78.9, 0)):
            Rectangle(MIRROR5_OUTLINE_W, MIRROR5_OUTLINE_H)
        with Locations((79.05, 0)):
            Circle(MIRROR5_OUTLINE_R, mode=Mode.SUBTRACT)
    # profile 2 of 2: a face of its own
    with BuildSketch(Plane.XY.offset(MIRROR5_START)):
        with Locations((-78.9, 0)):
            Rectangle(MIRROR5_OUTLINE_W, MIRROR5_OUTLINE_H)
        with Locations((-79.05, 0)):
            Circle(MIRROR5_OUTLINE_R, mode=Mode.SUBTRACT)
    extrude(amount=MIRROR5_DEPTH)

    # Mirror5 2 outline → Mirror5 2 (add)
    with BuildSketch(Plane.XY.offset(MIRROR5_START)):
        with Locations((79.05, 0)):
            Circle(MIRROR5_2_OUTLINE_R)
        with Locations((-79.05, 0)):
            Circle(MIRROR5_2_OUTLINE_R)
    extrude(amount=MIRROR5_2_DEPTH)

    # Sketch34 → Cut-Extrude19 (cut)
    with BuildSketch(Plane(origin=(0, 4, 0), x_dir=(1, 0, 0), z_dir=(0, 1, 0))):
        with Locations((-60.9, -34)):
            Rectangle(SKETCH34_W, SKETCH34_H)
    extrude(amount=-CUT_EXTRUDE19_DEPTH, mode=Mode.SUBTRACT)

    # Sketch35 → Cut-Extrude20 (cut)
    with BuildSketch(Plane.XZ.offset(4)):
        with Locations((-78.9, -3)):
            Rectangle(SKETCH35_W, SKETCH35_H)
        with Locations((78.9, -3)):
            Rectangle(SKETCH35_W, SKETCH35_H)
    extrude(amount=-CUT_EXTRUDE20_DEPTH, mode=Mode.SUBTRACT)

    # Sketch36 → Boss-Extrude12 (add)
    with BuildSketch(Plane(origin=(0, 0, -25.5), x_dir=(-1, 0, 0), z_dir=(0, 0, -1))):
        with Locations((0, -19)):
            Rectangle(SKETCH36_W, SKETCH36_H)
    extrude(amount=BOSS_EXTRUDE12_DEPTH)

    # Sketch38 → Boss-Extrude13 (add)
    with BuildSketch(Plane.XY.offset(-23.5)):
        with Locations((0, -19)):
            Rectangle(SKETCH38_W, SKETCH38_H)
    extrude(amount=BOSS_EXTRUDE13_DEPTH)

    # Chamfer1
    chamfer1_edges = [part.edges().sort_by_distance(p)[0] for p in [
        (0, -16, -25.5),
    ]]
    chamfer(chamfer1_edges, length=CHAMFER1_SIZE - 0.0001)  # a hair under: the kernel refuses the full size

    # Sketch37 → Cut-Extrude21 (cut)
    with BuildSketch(Plane(origin=(0, 0, -26.5), x_dir=(-1, 0, 0), z_dir=(0, 0, -1))):
        with Locations((-4, -19)):
            Circle(SKETCH37_R)
        with Locations((4, -19)):
            Circle(SKETCH37_R)
    extrude(amount=-CUT_EXTRUDE21_DEPTH, mode=Mode.SUBTRACT)

    # Chamfer2
    chamfer2_edges = [part.edges().sort_by_distance(p)[0] for p in [
        (0, -16, -23.5),
    ]]
    chamfer(chamfer2_edges, length=CHAMFER2_SIZE - 0.0001)  # a hair under: the kernel refuses the full size

    # Sketch39 → Cut-Extrude22 (cut)
    with BuildSketch(Plane.XY.offset(42)):
        with Locations((57, -7)):
            Rectangle(SKETCH39_W, SKETCH39_H)
    extrude(amount=-CUT_EXTRUDE22_DEPTH, mode=Mode.SUBTRACT)

    # Sketch40 → Cut-Extrude23 (cut, through all)
    with BuildSketch(Plane(origin=(0, 4, 0), x_dir=(1, 0, 0), z_dir=(0, 1, 0))):
        with Locations((62.9, -34)):
            Rectangle(SKETCH40_W, SKETCH40_H)
    extrude(amount=-CUT_EXTRUDE23_DEPTH, mode=Mode.SUBTRACT)

    # Sketch41 → Cut-Extrude24 (cut)
    with BuildSketch(Plane(origin=(0, 4, 0), x_dir=(1, 0, 0), z_dir=(0, 1, 0))):
        with Locations(Location((-80, -15, 0), (0, 0, 270))):
            Circle(SKETCH41_R)
        with Locations(Location((-70, -15, 0), (0, 0, 270))):
            Circle(SKETCH41_R)
        with Locations(Location((-60, -15, 0), (0, 0, 270))):
            Circle(SKETCH41_R)
        with Locations(Location((-50, -15, 0), (0, 0, 270))):
            Circle(SKETCH41_R)
        with Locations(Location((-40, -15, 0), (0, 0, 270))):
            Circle(SKETCH41_R)
        with Locations(Location((-70, -5, 0), (0, 0, 270))):
            Circle(SKETCH41_R)
        with Locations(Location((-60, -5, 0), (0, 0, 270))):
            Circle(SKETCH41_R)
        with Locations(Location((-50, -5, 0), (0, 0, 270))):
            Circle(SKETCH41_R)
        with Locations(Location((-40, -5, 0), (0, 0, 270))):
            Circle(SKETCH41_R)
        with Locations(Location((-70, 5, 0), (0, 0, 270))):
            Circle(SKETCH41_R)
        with Locations(Location((-60, 5, 0), (0, 0, 270))):
            Circle(SKETCH41_R)
        with Locations(Location((-50, 5, 0), (0, 0, 270))):
            Circle(SKETCH41_R)
        with Locations(Location((-40, 5, 0), (0, 0, 270))):
            Circle(SKETCH41_R)
        with Locations(Location((-70, 15, 0), (0, 0, 270))):
            Circle(SKETCH41_R)
        with Locations(Location((-60, 15, 0), (0, 0, 270))):
            Circle(SKETCH41_R)
        with Locations(Location((-50, 15, 0), (0, 0, 270))):
            Circle(SKETCH41_R)
        with Locations(Location((-40, 15, 0), (0, 0, 270))):
            Circle(SKETCH41_R)
        with Locations(Location((-80, -5, 0), (0, 0, 270))):
            Circle(SKETCH41_R)
        with Locations(Location((-80, 5, 0), (0, 0, 270))):
            Circle(SKETCH41_R)
        with Locations(Location((-80, 15, 0), (0, 0, 270))):
            Circle(SKETCH41_R)
    cut_extrude24 = extrude(amount=-CUT_EXTRUDE24_DEPTH, mode=Mode.SUBTRACT)

    # Mirror6: Cut-Extrude24 across plane
    add(cut_extrude24.mirror(Plane(origin=(0, 0, 0), x_dir=(0, 0, 1), z_dir=(1, 0, 0))), mode=Mode.SUBTRACT)


solid = part.part
